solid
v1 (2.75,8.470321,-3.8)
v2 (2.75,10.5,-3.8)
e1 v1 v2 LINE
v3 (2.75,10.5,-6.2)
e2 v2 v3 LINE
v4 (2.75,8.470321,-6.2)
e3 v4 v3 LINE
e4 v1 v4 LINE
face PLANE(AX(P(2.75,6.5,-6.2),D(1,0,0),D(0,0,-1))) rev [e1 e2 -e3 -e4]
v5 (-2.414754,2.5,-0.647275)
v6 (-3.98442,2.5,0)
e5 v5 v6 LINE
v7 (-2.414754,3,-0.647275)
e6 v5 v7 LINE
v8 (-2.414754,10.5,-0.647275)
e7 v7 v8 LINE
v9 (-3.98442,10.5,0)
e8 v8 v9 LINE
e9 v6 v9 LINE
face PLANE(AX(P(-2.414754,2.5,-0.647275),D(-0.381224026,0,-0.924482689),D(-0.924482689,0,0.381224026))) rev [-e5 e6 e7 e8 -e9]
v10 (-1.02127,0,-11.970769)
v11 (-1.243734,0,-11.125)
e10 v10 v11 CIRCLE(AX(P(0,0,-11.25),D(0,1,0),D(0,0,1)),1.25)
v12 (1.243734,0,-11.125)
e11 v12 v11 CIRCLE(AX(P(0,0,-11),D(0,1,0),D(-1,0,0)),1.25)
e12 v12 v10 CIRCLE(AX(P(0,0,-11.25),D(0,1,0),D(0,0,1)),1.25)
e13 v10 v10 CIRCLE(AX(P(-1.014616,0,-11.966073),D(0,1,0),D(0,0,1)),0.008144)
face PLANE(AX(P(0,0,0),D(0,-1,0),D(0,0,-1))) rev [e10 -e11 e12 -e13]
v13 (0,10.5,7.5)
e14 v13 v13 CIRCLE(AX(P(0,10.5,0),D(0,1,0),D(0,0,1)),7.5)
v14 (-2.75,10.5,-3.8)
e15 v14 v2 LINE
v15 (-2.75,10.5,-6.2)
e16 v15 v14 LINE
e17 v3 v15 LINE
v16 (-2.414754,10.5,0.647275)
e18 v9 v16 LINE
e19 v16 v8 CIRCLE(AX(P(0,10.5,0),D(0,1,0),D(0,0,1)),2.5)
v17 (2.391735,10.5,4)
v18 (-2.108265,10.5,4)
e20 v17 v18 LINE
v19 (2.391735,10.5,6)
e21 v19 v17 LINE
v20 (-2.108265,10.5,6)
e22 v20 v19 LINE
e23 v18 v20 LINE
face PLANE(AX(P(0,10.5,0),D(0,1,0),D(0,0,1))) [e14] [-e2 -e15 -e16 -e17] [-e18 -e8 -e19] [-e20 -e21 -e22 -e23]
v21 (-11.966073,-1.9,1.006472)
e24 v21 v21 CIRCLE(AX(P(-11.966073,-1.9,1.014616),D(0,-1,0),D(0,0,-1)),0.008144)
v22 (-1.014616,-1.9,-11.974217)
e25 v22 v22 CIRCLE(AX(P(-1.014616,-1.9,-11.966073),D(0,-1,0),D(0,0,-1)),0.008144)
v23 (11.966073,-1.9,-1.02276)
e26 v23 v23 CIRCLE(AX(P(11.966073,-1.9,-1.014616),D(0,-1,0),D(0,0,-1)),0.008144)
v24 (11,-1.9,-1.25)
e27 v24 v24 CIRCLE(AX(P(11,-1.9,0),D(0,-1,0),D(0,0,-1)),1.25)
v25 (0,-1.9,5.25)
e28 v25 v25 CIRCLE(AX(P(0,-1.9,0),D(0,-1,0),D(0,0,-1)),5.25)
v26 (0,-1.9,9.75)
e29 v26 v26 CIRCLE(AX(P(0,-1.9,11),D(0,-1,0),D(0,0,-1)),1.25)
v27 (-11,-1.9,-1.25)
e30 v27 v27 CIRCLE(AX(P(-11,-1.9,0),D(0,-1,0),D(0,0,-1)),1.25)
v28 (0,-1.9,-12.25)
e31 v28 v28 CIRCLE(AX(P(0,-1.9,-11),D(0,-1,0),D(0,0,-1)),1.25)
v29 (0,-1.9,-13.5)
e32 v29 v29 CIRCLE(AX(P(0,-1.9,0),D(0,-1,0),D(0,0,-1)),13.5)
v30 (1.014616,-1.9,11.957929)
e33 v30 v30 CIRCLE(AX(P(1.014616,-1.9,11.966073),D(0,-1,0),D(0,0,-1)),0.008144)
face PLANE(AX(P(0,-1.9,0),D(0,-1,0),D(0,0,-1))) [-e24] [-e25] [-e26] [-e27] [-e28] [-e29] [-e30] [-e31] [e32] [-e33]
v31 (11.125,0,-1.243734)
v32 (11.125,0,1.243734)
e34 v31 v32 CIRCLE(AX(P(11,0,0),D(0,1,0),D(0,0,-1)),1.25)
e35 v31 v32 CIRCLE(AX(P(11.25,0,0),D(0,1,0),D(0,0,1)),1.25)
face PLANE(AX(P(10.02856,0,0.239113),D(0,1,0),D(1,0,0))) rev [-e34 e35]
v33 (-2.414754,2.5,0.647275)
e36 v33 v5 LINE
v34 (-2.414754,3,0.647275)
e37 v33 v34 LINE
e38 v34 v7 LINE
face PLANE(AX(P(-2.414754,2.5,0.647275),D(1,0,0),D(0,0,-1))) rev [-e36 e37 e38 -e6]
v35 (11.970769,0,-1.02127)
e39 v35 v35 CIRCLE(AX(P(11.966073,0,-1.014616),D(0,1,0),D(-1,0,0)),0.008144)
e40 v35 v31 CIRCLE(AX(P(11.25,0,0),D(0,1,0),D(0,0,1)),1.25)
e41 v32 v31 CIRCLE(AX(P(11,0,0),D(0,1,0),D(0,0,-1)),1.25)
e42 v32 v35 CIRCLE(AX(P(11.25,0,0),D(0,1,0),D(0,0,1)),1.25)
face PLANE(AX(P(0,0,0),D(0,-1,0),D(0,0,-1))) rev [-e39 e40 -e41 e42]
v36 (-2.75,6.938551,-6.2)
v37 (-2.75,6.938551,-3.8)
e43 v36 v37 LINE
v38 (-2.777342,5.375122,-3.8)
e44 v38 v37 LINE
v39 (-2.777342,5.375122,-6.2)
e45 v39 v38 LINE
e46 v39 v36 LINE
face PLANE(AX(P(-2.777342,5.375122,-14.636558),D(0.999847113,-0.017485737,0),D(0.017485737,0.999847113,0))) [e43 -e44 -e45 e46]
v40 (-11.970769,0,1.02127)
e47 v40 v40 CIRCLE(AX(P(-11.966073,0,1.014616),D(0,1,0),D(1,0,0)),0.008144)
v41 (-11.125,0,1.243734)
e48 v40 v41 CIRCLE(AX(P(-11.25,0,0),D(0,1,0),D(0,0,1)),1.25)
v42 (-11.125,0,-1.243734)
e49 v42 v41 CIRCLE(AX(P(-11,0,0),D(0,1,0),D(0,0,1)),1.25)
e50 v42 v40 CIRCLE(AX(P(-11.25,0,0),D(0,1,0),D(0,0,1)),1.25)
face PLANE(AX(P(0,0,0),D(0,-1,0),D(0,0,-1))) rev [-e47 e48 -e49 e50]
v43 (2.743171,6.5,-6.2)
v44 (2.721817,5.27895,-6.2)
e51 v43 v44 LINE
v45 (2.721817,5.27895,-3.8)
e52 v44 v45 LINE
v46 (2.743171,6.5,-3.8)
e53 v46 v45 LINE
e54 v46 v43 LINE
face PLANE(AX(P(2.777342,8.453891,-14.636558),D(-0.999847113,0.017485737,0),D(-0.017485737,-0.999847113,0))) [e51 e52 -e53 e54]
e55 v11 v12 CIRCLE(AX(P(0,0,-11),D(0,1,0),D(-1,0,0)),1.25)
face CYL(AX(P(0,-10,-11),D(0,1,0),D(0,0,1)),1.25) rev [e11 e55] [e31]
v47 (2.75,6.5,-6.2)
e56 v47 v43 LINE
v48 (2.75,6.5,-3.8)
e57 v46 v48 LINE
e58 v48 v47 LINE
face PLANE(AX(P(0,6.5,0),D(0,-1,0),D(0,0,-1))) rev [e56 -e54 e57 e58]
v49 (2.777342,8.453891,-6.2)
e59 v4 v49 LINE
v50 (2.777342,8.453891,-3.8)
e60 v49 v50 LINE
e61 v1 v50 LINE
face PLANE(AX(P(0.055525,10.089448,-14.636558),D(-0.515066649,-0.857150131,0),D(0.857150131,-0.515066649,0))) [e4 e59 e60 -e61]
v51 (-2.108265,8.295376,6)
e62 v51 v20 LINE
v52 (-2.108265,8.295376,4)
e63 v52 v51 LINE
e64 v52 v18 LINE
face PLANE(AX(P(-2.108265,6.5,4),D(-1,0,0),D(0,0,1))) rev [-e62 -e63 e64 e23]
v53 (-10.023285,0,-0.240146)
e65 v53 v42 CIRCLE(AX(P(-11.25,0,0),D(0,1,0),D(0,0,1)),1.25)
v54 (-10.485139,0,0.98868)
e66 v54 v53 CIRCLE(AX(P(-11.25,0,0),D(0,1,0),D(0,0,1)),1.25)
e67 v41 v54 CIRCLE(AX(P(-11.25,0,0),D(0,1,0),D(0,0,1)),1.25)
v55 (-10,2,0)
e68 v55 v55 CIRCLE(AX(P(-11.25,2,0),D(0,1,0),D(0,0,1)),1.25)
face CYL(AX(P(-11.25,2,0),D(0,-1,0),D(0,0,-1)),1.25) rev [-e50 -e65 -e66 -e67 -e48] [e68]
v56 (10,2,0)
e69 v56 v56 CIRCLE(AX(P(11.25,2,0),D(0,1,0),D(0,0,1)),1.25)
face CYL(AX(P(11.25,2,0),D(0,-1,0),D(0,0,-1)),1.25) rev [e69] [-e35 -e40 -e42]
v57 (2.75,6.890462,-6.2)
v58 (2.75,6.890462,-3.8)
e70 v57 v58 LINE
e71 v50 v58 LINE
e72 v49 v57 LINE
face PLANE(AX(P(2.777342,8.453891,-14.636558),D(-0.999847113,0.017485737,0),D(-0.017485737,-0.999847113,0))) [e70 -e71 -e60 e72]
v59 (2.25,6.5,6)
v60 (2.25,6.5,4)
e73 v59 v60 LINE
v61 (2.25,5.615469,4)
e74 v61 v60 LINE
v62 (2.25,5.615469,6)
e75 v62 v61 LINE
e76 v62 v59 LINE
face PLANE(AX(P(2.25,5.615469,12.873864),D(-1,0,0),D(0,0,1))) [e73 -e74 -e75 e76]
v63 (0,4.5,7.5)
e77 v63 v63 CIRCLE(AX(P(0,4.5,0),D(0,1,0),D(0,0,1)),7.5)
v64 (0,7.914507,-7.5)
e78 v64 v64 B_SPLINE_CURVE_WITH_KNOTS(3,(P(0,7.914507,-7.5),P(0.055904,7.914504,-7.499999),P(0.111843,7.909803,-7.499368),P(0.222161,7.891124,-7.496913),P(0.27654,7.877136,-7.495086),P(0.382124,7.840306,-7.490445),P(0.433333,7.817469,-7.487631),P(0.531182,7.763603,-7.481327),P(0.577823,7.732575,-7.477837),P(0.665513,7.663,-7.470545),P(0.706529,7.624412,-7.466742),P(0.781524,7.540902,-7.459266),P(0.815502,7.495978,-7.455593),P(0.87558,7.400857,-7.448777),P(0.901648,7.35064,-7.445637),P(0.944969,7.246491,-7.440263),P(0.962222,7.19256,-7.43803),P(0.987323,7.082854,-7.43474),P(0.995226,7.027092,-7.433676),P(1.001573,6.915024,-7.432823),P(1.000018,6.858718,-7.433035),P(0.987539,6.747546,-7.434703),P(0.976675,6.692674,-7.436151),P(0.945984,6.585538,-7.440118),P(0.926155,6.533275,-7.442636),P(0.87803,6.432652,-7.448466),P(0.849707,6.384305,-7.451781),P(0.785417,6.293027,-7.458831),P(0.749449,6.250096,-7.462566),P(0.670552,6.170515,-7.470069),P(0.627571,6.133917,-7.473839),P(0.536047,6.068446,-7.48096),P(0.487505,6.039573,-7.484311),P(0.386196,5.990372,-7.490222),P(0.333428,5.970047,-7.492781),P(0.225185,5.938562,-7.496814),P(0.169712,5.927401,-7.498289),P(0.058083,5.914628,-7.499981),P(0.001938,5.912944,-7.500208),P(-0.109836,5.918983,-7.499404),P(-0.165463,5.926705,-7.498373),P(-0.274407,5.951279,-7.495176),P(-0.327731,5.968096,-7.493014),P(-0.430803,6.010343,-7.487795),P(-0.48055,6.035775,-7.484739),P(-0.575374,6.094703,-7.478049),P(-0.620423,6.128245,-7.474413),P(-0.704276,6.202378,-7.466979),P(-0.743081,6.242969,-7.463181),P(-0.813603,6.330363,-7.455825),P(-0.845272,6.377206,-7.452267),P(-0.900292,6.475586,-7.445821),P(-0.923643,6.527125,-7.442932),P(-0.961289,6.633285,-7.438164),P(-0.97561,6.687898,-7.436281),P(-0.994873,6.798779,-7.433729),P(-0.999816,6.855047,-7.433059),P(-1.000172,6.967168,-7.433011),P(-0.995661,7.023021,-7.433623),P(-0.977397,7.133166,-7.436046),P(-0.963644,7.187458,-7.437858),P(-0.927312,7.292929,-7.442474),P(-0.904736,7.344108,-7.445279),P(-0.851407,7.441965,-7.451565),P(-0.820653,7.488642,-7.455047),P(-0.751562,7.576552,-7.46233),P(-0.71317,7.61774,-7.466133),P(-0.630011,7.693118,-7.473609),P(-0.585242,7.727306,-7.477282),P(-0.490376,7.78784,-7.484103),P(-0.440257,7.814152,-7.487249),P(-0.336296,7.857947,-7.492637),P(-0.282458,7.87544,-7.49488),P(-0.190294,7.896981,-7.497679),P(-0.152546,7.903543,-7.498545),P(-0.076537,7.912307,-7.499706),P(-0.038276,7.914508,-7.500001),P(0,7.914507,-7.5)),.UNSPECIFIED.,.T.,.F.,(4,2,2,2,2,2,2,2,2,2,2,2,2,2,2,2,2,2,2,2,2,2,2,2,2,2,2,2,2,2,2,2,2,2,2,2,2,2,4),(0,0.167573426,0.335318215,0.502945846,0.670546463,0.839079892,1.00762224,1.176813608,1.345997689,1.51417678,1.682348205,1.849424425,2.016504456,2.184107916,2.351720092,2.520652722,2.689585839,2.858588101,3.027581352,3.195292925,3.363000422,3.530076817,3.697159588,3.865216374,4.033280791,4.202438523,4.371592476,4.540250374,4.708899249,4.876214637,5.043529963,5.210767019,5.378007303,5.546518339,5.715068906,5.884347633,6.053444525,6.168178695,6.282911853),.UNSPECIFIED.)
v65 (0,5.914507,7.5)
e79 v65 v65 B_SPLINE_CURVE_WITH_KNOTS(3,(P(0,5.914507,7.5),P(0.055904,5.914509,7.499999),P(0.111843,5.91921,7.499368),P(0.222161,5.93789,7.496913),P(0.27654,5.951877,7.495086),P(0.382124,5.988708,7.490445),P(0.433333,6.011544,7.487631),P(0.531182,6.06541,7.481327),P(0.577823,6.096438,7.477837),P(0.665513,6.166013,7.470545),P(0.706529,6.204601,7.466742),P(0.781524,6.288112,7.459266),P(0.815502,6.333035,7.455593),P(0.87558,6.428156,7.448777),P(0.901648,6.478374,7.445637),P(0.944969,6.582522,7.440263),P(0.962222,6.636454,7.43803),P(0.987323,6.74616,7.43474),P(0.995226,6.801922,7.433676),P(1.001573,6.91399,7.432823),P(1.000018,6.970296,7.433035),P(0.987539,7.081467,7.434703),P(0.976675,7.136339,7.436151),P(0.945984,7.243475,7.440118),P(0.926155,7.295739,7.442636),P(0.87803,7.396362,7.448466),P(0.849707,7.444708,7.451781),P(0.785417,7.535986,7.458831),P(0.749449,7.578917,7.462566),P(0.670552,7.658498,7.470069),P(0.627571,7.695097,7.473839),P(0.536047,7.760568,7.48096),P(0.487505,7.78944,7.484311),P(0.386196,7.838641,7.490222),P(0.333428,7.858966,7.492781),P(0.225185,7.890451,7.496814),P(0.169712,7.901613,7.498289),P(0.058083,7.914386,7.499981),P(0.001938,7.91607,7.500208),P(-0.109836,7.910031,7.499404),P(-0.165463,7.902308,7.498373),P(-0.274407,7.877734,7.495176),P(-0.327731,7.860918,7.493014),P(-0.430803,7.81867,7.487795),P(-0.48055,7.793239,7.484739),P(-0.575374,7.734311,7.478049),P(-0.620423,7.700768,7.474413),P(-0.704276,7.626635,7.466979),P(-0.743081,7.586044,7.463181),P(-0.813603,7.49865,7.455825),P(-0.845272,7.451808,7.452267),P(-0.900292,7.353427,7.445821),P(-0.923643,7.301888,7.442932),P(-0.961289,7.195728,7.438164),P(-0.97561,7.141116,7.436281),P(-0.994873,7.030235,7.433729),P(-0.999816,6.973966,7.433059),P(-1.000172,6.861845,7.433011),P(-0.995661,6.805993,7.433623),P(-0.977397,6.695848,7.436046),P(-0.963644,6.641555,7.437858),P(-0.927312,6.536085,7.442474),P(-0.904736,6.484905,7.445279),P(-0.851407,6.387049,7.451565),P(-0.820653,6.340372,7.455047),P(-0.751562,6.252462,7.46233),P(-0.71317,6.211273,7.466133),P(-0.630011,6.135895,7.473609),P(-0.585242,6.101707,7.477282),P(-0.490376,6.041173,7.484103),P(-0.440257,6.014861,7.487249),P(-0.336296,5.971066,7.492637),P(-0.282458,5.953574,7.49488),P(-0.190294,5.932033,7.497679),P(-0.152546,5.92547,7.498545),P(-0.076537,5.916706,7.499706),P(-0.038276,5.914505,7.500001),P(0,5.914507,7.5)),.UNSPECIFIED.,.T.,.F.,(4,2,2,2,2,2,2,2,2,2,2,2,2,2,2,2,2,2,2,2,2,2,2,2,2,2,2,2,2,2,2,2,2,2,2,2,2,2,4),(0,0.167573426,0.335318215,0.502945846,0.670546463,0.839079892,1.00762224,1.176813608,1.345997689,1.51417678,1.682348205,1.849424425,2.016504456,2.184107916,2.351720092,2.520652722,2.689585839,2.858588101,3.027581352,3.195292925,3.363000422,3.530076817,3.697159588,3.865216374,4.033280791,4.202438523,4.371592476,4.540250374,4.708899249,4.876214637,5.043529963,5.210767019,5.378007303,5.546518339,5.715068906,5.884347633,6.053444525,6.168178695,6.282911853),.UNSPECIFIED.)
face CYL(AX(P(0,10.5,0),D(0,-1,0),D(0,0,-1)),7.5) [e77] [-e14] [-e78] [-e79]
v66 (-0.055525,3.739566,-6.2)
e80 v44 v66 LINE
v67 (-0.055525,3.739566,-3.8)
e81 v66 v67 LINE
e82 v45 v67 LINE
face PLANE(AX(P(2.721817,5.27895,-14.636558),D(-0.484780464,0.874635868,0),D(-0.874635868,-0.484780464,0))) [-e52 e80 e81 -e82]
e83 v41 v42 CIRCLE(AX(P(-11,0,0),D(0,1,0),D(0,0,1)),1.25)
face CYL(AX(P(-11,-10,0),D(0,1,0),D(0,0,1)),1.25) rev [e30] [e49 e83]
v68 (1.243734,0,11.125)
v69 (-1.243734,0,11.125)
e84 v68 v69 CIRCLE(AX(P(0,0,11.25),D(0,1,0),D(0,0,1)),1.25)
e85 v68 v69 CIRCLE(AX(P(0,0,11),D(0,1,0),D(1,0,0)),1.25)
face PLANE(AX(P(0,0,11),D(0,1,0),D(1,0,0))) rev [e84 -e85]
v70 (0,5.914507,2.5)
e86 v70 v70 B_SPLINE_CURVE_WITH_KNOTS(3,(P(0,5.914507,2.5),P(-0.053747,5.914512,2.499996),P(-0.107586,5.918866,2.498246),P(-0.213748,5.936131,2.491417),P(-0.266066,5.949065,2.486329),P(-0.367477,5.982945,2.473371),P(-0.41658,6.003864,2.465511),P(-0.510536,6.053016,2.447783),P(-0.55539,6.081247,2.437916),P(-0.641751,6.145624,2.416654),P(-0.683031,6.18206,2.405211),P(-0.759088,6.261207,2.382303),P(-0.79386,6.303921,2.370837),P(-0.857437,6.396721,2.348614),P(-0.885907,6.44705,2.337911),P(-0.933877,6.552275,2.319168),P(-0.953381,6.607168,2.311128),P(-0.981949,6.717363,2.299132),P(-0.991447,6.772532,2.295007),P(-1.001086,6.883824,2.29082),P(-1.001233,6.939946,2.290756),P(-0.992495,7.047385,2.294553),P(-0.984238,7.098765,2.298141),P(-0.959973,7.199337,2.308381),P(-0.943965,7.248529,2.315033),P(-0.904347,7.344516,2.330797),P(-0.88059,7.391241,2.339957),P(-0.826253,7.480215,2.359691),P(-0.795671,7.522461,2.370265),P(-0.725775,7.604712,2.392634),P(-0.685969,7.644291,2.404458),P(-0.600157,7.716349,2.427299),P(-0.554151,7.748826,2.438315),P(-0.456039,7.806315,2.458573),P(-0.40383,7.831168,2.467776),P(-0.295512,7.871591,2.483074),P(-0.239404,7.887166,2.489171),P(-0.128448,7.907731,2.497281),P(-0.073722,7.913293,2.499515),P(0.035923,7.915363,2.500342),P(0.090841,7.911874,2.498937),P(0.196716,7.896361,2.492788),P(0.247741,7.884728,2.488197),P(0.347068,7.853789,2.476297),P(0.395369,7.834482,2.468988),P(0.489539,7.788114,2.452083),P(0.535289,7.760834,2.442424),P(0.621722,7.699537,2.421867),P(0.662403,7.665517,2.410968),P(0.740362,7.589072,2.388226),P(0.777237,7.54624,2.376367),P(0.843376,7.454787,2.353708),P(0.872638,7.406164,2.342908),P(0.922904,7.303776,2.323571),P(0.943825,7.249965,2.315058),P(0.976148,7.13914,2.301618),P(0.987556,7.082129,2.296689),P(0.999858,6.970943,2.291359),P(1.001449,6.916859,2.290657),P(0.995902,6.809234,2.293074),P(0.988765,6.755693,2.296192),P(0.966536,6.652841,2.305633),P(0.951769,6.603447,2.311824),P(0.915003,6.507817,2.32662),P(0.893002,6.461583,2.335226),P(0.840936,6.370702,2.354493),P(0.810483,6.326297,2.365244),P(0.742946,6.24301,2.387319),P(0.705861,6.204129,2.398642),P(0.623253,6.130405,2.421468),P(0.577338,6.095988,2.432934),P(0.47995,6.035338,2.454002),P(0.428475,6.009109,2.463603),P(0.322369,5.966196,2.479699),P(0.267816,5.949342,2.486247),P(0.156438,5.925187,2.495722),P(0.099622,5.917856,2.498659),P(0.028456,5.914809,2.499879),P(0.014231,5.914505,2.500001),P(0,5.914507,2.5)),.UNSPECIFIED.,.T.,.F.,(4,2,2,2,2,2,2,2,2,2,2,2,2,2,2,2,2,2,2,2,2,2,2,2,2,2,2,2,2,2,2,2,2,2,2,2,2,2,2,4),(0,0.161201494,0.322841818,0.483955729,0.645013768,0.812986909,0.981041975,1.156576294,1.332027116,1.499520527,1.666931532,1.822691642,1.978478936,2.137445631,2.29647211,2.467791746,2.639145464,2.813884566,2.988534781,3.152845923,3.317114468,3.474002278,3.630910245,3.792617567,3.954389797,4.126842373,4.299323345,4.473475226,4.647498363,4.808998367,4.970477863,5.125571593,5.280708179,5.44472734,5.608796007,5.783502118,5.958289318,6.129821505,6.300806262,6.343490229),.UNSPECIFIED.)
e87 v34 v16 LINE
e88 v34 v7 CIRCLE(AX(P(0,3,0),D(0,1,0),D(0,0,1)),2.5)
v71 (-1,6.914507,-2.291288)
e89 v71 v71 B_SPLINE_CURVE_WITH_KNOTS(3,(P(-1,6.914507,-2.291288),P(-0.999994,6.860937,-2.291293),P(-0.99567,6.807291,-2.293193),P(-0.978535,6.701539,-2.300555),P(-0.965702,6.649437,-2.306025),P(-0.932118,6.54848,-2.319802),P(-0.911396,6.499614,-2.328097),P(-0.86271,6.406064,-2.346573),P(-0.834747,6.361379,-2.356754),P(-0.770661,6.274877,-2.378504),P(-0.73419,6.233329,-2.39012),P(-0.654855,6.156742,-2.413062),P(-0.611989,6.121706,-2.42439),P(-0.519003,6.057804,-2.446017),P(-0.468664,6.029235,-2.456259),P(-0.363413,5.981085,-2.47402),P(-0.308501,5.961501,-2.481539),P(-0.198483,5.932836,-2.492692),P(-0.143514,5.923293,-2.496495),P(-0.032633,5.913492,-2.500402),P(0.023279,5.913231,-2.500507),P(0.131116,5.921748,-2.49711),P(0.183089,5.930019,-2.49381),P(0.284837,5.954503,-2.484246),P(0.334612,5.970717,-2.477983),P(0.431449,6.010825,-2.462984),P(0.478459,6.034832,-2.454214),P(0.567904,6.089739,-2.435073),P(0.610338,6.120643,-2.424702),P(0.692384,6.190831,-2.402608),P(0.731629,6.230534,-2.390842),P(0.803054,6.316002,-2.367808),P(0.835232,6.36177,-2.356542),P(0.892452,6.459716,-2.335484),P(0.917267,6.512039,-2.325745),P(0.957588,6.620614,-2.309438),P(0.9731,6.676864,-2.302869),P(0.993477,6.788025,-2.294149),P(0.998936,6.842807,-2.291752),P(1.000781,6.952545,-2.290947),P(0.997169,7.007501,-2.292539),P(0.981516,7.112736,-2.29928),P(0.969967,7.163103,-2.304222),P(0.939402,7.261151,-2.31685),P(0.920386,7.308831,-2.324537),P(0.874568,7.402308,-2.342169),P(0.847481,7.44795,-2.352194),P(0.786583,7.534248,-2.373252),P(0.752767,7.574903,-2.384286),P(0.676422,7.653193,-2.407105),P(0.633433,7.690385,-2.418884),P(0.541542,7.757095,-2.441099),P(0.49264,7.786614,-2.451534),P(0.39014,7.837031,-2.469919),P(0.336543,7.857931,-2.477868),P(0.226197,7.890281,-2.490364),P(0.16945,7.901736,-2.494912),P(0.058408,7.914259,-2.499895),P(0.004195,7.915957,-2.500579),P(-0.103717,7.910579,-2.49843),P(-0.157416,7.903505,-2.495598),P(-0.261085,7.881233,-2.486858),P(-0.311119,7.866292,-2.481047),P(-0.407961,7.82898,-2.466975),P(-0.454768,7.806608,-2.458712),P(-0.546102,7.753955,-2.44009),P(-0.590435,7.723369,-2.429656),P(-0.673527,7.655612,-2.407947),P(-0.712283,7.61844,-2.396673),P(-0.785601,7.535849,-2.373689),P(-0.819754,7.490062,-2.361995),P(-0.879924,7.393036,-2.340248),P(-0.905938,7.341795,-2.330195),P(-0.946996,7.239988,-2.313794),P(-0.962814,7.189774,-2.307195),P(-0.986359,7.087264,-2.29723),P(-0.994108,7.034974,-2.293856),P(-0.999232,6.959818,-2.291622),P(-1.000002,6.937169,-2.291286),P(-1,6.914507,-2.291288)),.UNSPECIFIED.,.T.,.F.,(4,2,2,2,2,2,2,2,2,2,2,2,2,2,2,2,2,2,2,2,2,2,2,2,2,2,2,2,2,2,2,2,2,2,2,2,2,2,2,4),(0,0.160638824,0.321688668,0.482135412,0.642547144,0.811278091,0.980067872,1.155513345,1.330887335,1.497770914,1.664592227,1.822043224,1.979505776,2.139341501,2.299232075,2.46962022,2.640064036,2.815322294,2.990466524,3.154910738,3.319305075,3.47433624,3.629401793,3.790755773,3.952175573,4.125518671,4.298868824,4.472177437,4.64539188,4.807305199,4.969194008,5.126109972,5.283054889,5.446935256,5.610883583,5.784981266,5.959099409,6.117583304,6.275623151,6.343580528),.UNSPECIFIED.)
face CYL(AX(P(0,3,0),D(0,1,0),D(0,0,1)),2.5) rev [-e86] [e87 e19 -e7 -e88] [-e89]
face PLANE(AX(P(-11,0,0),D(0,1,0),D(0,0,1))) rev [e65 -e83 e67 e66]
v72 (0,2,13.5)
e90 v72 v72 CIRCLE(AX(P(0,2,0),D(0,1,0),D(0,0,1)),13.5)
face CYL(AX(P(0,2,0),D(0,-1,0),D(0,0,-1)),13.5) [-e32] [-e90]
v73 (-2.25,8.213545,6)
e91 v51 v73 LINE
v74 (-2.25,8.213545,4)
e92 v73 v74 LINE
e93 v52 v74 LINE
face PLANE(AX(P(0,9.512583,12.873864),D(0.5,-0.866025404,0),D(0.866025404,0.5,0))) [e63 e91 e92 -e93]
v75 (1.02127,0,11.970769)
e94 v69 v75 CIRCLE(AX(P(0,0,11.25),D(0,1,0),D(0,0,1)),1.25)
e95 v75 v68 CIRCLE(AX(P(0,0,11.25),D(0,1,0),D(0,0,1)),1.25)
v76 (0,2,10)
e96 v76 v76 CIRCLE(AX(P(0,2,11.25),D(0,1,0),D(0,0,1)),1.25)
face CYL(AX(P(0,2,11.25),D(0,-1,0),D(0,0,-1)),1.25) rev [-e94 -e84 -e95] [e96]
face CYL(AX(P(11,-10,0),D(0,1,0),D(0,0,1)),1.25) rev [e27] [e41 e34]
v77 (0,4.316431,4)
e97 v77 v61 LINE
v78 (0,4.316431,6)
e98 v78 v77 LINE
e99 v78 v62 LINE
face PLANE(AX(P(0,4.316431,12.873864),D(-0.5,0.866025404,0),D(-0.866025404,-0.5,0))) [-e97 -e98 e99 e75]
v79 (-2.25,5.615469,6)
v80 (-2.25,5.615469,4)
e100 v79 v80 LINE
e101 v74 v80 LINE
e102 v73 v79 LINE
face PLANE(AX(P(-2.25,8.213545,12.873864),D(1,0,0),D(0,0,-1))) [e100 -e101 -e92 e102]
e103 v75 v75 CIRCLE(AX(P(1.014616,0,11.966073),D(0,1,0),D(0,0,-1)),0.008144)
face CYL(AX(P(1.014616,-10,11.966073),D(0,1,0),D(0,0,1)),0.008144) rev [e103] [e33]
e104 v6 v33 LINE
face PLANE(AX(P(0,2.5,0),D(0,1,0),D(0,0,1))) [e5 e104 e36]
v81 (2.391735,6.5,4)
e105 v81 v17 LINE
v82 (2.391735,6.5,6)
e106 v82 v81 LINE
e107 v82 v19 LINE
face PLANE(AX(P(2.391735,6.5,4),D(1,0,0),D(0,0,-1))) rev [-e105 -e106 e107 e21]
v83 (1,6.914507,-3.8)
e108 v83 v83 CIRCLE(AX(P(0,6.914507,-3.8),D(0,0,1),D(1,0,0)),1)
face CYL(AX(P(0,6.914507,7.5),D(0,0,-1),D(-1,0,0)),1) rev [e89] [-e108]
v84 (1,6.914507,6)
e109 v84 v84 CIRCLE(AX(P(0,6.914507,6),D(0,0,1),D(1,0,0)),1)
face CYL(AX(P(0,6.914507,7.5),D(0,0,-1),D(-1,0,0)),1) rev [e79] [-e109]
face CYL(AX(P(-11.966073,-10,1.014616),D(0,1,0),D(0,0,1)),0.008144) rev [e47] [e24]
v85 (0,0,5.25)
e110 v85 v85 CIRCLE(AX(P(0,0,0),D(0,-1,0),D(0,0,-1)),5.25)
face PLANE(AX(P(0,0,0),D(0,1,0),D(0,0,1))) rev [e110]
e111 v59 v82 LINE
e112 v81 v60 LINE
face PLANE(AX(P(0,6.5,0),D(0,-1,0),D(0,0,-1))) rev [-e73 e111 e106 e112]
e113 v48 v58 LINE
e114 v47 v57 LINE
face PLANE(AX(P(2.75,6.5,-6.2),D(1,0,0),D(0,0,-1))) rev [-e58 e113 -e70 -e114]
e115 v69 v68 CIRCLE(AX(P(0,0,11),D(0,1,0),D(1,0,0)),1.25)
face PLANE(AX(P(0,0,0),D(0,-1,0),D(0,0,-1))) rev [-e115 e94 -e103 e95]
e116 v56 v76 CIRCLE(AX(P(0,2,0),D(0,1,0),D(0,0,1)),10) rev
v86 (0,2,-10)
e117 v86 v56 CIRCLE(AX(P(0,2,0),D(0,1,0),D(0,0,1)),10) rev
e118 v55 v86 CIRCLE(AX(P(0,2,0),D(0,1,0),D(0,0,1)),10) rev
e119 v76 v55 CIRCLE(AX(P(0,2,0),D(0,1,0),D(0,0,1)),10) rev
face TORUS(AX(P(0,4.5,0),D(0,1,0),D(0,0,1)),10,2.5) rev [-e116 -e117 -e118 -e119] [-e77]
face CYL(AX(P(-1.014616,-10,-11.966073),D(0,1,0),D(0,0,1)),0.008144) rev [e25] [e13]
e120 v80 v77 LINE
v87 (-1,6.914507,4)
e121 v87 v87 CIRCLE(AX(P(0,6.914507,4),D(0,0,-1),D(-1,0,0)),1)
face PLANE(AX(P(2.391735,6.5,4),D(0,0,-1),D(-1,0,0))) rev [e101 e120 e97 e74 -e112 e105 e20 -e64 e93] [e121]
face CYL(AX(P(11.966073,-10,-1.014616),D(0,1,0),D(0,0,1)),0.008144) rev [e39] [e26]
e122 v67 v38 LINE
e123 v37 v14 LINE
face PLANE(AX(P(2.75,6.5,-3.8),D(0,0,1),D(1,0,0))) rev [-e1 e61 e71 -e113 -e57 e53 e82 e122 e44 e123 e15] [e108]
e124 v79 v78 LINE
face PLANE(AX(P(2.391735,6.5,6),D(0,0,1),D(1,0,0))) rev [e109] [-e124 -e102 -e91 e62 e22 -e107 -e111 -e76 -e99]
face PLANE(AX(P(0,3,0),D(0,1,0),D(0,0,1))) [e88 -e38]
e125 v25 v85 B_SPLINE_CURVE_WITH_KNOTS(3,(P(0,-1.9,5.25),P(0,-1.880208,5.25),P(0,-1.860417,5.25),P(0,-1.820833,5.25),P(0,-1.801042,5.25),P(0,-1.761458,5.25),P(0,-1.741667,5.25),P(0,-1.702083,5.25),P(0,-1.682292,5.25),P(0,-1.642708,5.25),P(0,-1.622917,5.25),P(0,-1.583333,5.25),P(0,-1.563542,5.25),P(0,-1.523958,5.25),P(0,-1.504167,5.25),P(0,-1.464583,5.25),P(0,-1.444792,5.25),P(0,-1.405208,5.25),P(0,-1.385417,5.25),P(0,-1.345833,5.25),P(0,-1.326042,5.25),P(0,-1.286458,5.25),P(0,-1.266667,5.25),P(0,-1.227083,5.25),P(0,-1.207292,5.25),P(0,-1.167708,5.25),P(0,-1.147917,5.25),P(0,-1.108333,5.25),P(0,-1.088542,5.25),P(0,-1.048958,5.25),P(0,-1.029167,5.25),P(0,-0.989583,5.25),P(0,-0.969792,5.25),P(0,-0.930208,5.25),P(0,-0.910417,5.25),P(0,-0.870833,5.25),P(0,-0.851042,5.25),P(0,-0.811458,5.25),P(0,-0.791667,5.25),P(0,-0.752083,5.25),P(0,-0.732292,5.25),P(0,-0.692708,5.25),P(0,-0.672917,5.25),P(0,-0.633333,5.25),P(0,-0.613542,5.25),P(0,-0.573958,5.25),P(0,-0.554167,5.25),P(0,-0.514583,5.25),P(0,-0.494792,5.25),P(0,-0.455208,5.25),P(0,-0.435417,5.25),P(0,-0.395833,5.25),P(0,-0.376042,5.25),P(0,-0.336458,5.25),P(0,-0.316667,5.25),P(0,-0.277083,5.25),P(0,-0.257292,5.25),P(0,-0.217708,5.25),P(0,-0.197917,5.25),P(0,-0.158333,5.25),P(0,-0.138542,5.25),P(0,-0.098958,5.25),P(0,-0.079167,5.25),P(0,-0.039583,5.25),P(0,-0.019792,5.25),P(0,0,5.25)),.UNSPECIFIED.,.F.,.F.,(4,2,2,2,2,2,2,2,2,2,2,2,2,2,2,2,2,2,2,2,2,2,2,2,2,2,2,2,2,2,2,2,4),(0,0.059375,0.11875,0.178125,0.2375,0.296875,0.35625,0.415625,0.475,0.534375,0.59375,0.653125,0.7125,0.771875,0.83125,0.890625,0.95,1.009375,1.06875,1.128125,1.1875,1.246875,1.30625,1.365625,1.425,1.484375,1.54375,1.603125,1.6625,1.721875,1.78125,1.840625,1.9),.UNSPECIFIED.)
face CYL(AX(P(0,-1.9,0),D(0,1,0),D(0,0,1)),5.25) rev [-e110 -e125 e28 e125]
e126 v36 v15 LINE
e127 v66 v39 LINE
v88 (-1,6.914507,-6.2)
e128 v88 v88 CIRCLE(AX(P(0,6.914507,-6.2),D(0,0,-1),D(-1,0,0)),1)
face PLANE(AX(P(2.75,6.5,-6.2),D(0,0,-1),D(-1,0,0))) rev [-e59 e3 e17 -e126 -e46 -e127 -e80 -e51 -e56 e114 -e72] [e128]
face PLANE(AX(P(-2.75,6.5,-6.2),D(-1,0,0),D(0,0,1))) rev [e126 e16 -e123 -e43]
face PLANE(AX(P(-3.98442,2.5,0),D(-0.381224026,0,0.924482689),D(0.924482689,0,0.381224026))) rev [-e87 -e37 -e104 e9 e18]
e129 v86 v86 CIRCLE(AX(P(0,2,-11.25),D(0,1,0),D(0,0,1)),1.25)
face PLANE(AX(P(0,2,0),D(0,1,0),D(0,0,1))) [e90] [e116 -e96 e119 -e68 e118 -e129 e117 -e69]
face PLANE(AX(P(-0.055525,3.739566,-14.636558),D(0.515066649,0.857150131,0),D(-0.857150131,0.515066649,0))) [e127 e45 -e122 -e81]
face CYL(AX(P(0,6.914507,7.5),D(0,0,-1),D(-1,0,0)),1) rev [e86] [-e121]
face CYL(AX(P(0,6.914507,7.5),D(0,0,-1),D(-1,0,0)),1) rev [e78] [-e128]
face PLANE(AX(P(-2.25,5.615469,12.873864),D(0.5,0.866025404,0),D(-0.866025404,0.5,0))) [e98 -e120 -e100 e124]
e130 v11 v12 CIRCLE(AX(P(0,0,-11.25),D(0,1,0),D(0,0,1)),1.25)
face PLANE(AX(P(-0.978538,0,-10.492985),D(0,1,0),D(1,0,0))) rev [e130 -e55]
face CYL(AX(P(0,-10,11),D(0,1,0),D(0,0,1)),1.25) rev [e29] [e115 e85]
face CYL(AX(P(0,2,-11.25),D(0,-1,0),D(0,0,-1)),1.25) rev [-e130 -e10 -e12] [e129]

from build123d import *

# Parameters (mm, degrees)
SKETCH1_R               = 13.5
SKETCH1_R_2             = 1.25
BOSS_EXTRUDE2_DEPTH     = 2
SKETCH2_R               = 7.5
BOSS_EXTRUDE3_DEPTH     = 8.5
SKETCH4_R               = 2.5
CUT_EXTRUDE1_DEPTH      = 7.5
CUT_EXTRUDE2_DEPTH      = 7.5
CUT_EXTRUDE2_DEPTH_BACK = 11.75
SKETCH5_R               = 1
BOSS_EXTRUDE5_START     = 1.9
SKETCH7_R               = 13.5
SKETCH7_R_2             = 5.25
BOSS_EXTRUDE5_DEPTH     = 1.9
CUT_EXTRUDE3_DEPTH      = 8
FILLET1_R               = 2.5
SKETCH12_R              = 0.00537481
SKETCH12_R_2            = 0.008144056
SKETCH12_R_3            = 1.25
SKETCH12_R_4            = 0.012822725
CUT_EXTRUDE4_DEPTH      = 10
CIRPATTERN1_COUNT       = 4
SKETCH13_W              = 5.5
SKETCH13_H              = 2.4
SKETCH13_W_2            = 4.5
SKETCH13_H_2            = 2
CUT_EXTRUDE5_DEPTH      = 4
CUT_EXTRUDE6_DEPTH      = 2.4
CUT_EXTRUDE7_DEPTH      = 2


with BuildPart() as part:
    # Sketch1 → Boss-Extrude2 (new body)
    with BuildSketch(Plane(origin=(0, 0, 0), x_dir=(1, 0, 0), z_dir=(0, 1, 0))):
        with Locations(Location((0, 0, 0), (0, 0, 270))):
            Circle(SKETCH1_R)
        with Locations(Location((11.25, 0, 0), (0, 0, 270))):
            Circle(SKETCH1_R_2, mode=Mode.SUBTRACT)
        with Locations(Location((0, -11.25, 0), (0, 0, 270))):
            Circle(SKETCH1_R_2, mode=Mode.SUBTRACT)
        with Locations(Location((-11.25, 0, 0), (0, 0, 270))):
            Circle(SKETCH1_R_2, mode=Mode.SUBTRACT)
        with Locations(Location((0, 11.25, 0), (0, 0, 270))):
            Circle(SKETCH1_R_2, mode=Mode.SUBTRACT)
    extrude(amount=BOSS_EXTRUDE2_DEPTH)

    # Sketch2 → Boss-Extrude3 (add)
    with BuildSketch(Plane(origin=(0, 2, 0), x_dir=(1, 0, 0), z_dir=(0, 1, 0))):
        with Locations(Location((0, 0, 0), (0, 0, 270))):
            Circle(SKETCH2_R)
    extrude(amount=BOSS_EXTRUDE3_DEPTH)

    # Sketch4 → Cut-Extrude1 (cut)
    with BuildSketch(Plane(origin=(0, 10.5, 0), x_dir=(1, 0, 0), z_dir=(0, 1, 0))):
        with Locations(Location((0, 0, 0), (0, 0, 270))):
            Circle(SKETCH4_R)
    extrude(amount=-CUT_EXTRUDE1_DEPTH, mode=Mode.SUBTRACT)

    # Sketch5 → Cut-Extrude2 (cut, two sides: drawn at the far end of the back side and taken through both)
    with BuildSketch(Plane.XY.offset(-CUT_EXTRUDE2_DEPTH_BACK)):
        with Locations(Location((0, 6.914506731, 0), (0, 0, 180))):
            Circle(SKETCH5_R)
    extrude(amount=CUT_EXTRUDE2_DEPTH + CUT_EXTRUDE2_DEPTH_BACK, mode=Mode.SUBTRACT)

    # Sketch7 → Boss-Extrude5 (add)
    with BuildSketch(Plane.XZ.offset(BOSS_EXTRUDE5_START)):
        with Locations(Location((0, 0, 0), (0, 0, 270))):
            Circle(SKETCH7_R)
        with Locations(Location((0, 0, 0), (0, 0, 90))):
            Circle(SKETCH7_R_2, mode=Mode.SUBTRACT)
    extrude(amount=-BOSS_EXTRUDE5_DEPTH)

    # Sketch9 → Cut-Extrude3 (cut)
    with BuildSketch(Plane(origin=(0, 10.5, 0), x_dir=(1, 0, 0), z_dir=(0, 1, 0))):
        Polygon((-2.414753661, -0.64727487), (-2.414753661, 0.64727487), (-3.984419716, 0), align=None)
    extrude(amount=-CUT_EXTRUDE3_DEPTH, mode=Mode.SUBTRACT)

    # Fillet1
    fillet1_edges = [part.edges().sort_by_distance(p)[0] for p in [
        (0, 2, -7.5),
    ]]
    fillet(fillet1_edges, radius=FILLET1_R - 0.0001)  # a hair under: the kernel refuses the full size

    # Sketch12 → Cut-Extrude4 (cut)
    with BuildSketch(Plane(origin=(0, 0, 0), x_dir=(1, 0, 0), z_dir=(0, 1, 0))):
        with Locations(Location((-0.239113034, -10.028559531, 0), (0, 0, 101.087404696))):
            Circle(SKETCH12_R)
        with Locations(Location((-1.014615915, 11.966073133, 0), (0, 0, 144.78716899))):
            Circle(SKETCH12_R_2)
        with Locations(Location((-11, 0, 0), (0, 0, 264.260829523))):
            Circle(SKETCH12_R_3)
        with Locations(Location((10.492985163, 0.978537759, 0), (0, 0, 127.726196418))):
            Circle(SKETCH12_R_4)
    cut_extrude4 = extrude(amount=-CUT_EXTRUDE4_DEPTH, mode=Mode.SUBTRACT)

    # CirPattern1: Cut-Extrude4 ×4 about axis
    cirpattern1_axis = Axis((0, 0, 0), (0, 1, 0))
    for i in range(1, CIRPATTERN1_COUNT):
        add(cut_extrude4.rotate(cirpattern1_axis, i * 360 / CIRPATTERN1_COUNT), mode=Mode.SUBTRACT)

    # Sketch13 → Cut-Extrude5 (cut)
    with BuildSketch(Plane(origin=(0, 10.5, 0), x_dir=(1, 0, 0), z_dir=(0, 1, 0))):
        with Locations((0, 5)):
            Rectangle(SKETCH13_W, SKETCH13_H)
        with Locations((0.141735204, -5)):
            Rectangle(SKETCH13_W_2, SKETCH13_H_2)
    extrude(amount=-CUT_EXTRUDE5_DEPTH, mode=Mode.SUBTRACT)

    # Sketch14 → Cut-Extrude6 (cut)
    with BuildSketch(Plane(origin=(0, 0, -3.8), x_dir=(-1, 0, 0), z_dir=(0, 0, -1))):
        Polygon((2.721817224, 8.550063007), (-0.055524673, 10.089447729), (-2.777341897, 8.453891453), (-2.721817224, 5.278950455), (0.055524673, 3.739565732), (2.777341897, 5.375122009), align=None)
    extrude(amount=CUT_EXTRUDE6_DEPTH, mode=Mode.SUBTRACT)

    # Sketch15 → Cut-Extrude7 (cut)
    with BuildSketch(Plane.XY.offset(4)):
        Polygon((2.25, 8.213544837), (0, 9.512582942), (-2.25, 8.213544837), (-2.25, 5.615468625), (0, 4.31643052), (2.25, 5.615468625), align=None)
    extrude(amount=CUT_EXTRUDE7_DEPTH, mode=Mode.SUBTRACT)


solid = part.part
